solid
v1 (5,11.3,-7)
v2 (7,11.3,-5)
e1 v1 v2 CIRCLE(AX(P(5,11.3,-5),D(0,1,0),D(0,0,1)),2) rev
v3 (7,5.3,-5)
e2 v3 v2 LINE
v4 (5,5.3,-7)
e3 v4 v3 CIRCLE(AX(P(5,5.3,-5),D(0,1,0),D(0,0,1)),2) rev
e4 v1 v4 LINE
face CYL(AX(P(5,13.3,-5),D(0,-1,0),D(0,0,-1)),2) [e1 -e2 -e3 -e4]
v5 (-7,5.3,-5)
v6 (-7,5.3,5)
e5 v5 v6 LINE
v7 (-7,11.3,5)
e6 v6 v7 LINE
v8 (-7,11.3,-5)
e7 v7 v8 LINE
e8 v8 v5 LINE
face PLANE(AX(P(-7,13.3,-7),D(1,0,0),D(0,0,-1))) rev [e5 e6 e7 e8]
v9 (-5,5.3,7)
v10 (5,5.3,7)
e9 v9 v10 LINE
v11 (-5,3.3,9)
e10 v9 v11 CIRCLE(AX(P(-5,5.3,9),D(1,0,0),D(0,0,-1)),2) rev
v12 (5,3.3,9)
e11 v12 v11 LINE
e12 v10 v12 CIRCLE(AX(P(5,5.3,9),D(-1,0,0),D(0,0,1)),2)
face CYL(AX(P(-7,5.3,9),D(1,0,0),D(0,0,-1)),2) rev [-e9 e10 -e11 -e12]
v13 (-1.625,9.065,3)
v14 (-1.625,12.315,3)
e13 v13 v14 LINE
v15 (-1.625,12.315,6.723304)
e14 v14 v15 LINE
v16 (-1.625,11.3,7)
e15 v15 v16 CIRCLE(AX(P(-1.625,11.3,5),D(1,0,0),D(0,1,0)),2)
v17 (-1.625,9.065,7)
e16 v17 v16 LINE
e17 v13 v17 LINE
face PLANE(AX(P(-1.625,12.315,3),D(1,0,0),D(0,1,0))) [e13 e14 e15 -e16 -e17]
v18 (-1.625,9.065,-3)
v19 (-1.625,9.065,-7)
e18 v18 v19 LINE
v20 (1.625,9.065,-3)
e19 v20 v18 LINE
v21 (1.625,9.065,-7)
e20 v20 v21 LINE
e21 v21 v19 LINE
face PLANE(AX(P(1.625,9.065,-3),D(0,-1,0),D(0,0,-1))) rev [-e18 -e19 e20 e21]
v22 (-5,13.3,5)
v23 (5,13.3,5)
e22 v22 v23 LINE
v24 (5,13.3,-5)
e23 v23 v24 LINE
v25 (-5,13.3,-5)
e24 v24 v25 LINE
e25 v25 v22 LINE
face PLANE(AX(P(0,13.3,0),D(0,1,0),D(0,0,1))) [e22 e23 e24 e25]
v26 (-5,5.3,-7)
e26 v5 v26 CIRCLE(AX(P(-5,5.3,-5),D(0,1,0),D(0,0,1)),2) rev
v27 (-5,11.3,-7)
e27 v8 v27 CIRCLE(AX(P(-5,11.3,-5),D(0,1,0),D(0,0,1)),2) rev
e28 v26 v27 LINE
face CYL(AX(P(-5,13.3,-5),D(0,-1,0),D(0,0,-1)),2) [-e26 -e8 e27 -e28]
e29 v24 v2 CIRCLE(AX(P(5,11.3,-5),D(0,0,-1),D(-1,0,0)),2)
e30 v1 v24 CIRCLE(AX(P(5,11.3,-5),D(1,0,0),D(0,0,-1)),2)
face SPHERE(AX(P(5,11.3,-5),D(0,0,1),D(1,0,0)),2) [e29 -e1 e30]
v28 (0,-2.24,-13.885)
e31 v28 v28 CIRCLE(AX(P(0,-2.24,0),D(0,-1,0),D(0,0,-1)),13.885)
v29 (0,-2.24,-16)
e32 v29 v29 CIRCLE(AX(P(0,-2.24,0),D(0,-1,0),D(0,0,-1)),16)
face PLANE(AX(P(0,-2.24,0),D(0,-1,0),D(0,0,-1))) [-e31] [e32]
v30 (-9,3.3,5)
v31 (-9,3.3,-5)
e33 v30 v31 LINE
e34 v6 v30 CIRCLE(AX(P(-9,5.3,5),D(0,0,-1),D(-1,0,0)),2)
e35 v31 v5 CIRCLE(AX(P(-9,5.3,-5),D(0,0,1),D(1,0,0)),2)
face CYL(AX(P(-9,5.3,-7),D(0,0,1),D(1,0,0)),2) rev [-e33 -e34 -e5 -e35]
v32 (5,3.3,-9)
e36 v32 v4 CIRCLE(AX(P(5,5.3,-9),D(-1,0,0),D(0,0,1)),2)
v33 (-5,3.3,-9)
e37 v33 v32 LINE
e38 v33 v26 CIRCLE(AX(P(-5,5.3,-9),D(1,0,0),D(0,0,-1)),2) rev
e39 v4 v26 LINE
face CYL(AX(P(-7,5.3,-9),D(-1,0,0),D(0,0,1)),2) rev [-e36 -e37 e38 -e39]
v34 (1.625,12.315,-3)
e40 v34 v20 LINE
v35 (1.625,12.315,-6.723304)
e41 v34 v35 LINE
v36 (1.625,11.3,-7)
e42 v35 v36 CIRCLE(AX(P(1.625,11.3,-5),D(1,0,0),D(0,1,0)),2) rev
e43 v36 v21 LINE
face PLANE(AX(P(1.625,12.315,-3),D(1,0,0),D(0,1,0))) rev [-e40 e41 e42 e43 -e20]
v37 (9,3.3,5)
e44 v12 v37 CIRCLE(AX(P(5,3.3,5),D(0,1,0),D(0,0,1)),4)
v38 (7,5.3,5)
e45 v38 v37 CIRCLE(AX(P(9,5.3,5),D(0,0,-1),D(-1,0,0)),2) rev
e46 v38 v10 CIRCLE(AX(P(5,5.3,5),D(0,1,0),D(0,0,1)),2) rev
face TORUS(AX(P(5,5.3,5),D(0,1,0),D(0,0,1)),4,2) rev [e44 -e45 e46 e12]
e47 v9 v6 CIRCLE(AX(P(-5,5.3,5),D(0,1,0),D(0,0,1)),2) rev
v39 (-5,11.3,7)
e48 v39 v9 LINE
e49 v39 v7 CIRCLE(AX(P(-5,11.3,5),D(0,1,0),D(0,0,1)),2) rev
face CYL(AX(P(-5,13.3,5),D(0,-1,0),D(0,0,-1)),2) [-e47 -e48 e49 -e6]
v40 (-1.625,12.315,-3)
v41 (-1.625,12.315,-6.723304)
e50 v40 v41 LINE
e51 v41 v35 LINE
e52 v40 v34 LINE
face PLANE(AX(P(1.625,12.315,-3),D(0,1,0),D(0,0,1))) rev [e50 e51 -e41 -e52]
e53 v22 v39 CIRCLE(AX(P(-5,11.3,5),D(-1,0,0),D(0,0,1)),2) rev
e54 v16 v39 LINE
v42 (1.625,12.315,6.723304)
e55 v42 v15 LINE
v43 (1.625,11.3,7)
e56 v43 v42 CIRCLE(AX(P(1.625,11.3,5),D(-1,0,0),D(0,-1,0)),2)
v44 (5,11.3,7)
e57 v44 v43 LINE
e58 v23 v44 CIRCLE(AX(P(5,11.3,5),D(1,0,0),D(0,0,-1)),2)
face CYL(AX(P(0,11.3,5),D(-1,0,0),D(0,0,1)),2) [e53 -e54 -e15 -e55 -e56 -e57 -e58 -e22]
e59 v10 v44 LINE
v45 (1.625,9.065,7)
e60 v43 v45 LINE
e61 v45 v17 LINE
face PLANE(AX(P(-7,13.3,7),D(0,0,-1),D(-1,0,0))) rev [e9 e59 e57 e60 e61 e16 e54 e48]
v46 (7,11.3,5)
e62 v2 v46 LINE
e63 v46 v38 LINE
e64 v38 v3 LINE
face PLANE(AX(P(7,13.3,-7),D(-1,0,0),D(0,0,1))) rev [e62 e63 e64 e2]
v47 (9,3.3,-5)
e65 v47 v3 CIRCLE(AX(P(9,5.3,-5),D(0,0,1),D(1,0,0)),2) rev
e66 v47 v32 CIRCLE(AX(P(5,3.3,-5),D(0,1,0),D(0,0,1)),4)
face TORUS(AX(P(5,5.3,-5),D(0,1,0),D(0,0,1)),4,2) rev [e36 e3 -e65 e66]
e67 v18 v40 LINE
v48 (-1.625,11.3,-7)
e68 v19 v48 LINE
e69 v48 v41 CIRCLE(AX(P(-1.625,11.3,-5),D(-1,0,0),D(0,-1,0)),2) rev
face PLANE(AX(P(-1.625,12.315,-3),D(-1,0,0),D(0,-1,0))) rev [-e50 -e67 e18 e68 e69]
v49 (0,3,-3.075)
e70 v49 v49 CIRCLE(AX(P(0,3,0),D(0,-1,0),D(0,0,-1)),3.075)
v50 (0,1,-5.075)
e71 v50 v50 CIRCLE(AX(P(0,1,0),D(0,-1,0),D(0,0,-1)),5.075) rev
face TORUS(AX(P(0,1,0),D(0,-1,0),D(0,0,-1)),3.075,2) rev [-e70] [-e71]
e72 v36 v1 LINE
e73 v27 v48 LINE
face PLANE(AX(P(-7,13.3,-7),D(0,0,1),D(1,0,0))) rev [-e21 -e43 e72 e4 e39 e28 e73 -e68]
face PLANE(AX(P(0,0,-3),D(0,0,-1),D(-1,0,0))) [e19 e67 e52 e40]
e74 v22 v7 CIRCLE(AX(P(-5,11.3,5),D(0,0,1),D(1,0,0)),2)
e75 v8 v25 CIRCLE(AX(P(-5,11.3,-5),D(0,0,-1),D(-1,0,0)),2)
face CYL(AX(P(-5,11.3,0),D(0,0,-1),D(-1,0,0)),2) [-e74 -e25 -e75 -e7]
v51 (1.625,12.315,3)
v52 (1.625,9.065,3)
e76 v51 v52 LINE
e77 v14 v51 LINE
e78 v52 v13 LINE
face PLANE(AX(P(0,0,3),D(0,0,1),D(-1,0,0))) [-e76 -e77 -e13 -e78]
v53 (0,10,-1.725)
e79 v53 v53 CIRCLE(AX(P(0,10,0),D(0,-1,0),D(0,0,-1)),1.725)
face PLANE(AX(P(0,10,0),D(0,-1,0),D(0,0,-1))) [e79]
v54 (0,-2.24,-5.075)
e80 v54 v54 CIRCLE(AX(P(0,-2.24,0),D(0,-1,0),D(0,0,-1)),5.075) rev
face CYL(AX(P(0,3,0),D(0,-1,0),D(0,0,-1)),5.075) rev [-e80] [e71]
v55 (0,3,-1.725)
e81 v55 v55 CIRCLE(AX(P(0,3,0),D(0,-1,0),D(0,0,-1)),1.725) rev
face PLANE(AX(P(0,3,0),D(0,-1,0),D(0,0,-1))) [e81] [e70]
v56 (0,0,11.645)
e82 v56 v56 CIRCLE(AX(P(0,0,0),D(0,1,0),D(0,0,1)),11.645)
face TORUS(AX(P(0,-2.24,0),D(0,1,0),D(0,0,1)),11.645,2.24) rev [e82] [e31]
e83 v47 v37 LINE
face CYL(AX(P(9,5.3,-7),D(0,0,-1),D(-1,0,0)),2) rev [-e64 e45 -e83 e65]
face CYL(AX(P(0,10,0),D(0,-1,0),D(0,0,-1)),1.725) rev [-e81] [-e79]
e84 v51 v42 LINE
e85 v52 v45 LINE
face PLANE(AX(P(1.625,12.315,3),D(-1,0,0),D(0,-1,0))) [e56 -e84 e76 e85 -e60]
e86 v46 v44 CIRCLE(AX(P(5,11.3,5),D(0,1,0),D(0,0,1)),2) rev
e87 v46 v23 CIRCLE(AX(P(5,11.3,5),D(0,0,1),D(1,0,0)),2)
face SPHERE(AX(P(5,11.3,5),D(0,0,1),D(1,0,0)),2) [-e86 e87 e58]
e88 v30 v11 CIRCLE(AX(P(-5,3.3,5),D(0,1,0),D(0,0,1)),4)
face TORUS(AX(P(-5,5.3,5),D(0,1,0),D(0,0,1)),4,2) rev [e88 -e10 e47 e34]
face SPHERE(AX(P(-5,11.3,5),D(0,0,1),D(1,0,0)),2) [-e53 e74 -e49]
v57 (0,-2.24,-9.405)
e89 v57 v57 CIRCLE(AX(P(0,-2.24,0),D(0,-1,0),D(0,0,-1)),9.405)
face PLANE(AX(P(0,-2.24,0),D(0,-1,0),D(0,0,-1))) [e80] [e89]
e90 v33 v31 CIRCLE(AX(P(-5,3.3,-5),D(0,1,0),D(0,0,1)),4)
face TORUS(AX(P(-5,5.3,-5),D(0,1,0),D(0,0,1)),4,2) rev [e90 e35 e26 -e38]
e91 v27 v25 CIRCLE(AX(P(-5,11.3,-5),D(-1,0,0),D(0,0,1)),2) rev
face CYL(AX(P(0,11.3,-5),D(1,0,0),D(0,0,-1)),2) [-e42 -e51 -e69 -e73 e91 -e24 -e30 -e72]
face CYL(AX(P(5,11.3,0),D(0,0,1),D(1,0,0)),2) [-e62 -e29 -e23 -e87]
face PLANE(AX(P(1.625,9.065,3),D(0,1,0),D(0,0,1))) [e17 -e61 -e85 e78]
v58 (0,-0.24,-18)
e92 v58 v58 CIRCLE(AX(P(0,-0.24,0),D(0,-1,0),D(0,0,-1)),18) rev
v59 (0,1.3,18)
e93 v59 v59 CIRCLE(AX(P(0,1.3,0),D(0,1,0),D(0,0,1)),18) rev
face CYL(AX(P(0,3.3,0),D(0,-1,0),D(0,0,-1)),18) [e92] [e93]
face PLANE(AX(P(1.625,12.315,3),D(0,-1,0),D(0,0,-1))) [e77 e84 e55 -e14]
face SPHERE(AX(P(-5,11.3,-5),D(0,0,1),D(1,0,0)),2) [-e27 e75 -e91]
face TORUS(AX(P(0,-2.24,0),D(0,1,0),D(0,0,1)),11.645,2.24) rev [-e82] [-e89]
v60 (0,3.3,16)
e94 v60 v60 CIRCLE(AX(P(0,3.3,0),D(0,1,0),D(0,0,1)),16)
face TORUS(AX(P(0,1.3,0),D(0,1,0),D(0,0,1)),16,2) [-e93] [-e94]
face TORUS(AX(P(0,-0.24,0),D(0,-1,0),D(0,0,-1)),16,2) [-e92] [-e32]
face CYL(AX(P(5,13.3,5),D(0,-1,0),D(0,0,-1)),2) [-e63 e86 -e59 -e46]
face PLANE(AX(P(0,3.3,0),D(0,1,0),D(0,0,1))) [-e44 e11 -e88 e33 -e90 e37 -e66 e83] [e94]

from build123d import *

# Parameters (mm, degrees)
SKETCH2_R           = 18
BOSS_EXTRUDE1_DEPTH = 3.3
SKETCH3_W           = 14
SKETCH3_H           = 14
BOSS_EXTRUDE2_DEPTH = 10
SKETCH12_R          = 1.725
CUT_EXTRUDE2_DEPTH  = 10
SKETCH13_R          = 5.075
CUT_EXTRUDE4_DEPTH  = 3
BOSS_EXTRUDE3_START = 2.24
SKETCH17_R          = 18
SKETCH17_R_2        = 13.885
SKETCH17_R_3        = 9.405
SKETCH17_R_4        = 5.075
BOSS_EXTRUDE3_DEPTH = 2.24
FILLET8_R           = 2.24
FILLET7_R           = 2
SKETCH21_W          = 3.25
SKETCH21_H          = 3.25
CUT_EXTRUDE6_DEPTH  = 4
FILLET9_R           = 2


# Some blends are built 0.0001 mm under size
with BuildPart() as part:
    # Sketch2 → Boss-Extrude1 (new body)
    with BuildSketch(Plane(origin=(0, 0, 0), x_dir=(1, 0, 0), z_dir=(0, 1, 0))):
        with Locations(Location((0, 0, 0), (0, 0, 270))):
            Circle(SKETCH2_R)
    extrude(amount=BOSS_EXTRUDE1_DEPTH)

    # Sketch3 → Boss-Extrude2 (add)
    with BuildSketch(Plane(origin=(0, 3.3, 0), x_dir=(1, 0, 0), z_dir=(0, 1, 0))):
        Rectangle(SKETCH3_W, SKETCH3_H)
    extrude(amount=BOSS_EXTRUDE2_DEPTH)

    # Sketch12 → Cut-Extrude2 (cut)
    with BuildSketch(Plane.XZ):
        with Locations(Location((0, 0, 0), (0, 0, 270))):
            Circle(SKETCH12_R)
    extrude(amount=-CUT_EXTRUDE2_DEPTH, mode=Mode.SUBTRACT)

    # Sketch13 → Cut-Extrude4 (cut)
    with BuildSketch(Plane.XZ):
        with Locations(Location((0, 0, 0), (0, 0, 270))):
            Circle(SKETCH13_R)
    extrude(amount=-CUT_EXTRUDE4_DEPTH, mode=Mode.SUBTRACT)

    # Sketch17 → Boss-Extrude3 (add)
    # profile 1 of 2: a face of its own
    with BuildSketch(Plane.XZ.offset(BOSS_EXTRUDE3_START)):
        with Locations(Location((0, 0, 0), (0, 0, 270))):
            Circle(SKETCH17_R)
        with Locations(Location((0, 0, 0), (0, 0, 270))):
            Circle(SKETCH17_R_2, mode=Mode.SUBTRACT)
    # profile 2 of 2: a face of its own
    with BuildSketch(Plane.XZ.offset(BOSS_EXTRUDE3_START)):
        with Locations(Location((0, 0, 0), (0, 0, 90))):
            Circle(SKETCH17_R_3)
        with Locations(Location((0, 0, 0), (0, 0, 270))):
            Circle(SKETCH17_R_4, mode=Mode.SUBTRACT)
    extrude(amount=-BOSS_EXTRUDE3_DEPTH)

    # Fillet8
    fillet8_edges = [part.edges().sort_by_distance(p)[0] for p in [
        (0, 0, 13.885),
        (0, 0, -9.405),
    ]]
    fillet(fillet8_edges, radius=FILLET8_R - 0.0001)  # a hair under: the kernel refuses the full size

    # Fillet7
    fillet7_edges = [part.edges().sort_by_distance(p)[0] for p in [
        (0, 3, 5.075),
    ]]
    fillet(fillet7_edges, radius=FILLET7_R)

    # Sketch21 → Cut-Extrude6 (cut)
    with BuildSketch(Plane(origin=(0, 0, -7), x_dir=(-1, 0, 0), z_dir=(0, 0, -1))):
        with Locations((0, 10.69)):
            Rectangle(SKETCH21_W, SKETCH21_H)
    cut_extrude6 = extrude(amount=-CUT_EXTRUDE6_DEPTH, mode=Mode.SUBTRACT)

    # Mirror2: Cut-Extrude6 across plane
    add(cut_extrude6.mirror(Plane.XY), mode=Mode.SUBTRACT)

    # Fillet9
    # the kernel refuses this fillet: 2 mm, written as the material it takes off along each edge
    with BuildSketch(Plane(origin=(5, 11.3, 5), x_dir=(1, 0, 0), z_dir=(0, 0, 1))) as fillet9_piece_1_section:
        Polygon((0, 0), (FILLET9_R, 0), (FILLET9_R, FILLET9_R), (0, FILLET9_R), align=None)
    fillet9_piece_1 = extrude(amount=FILLET9_R, mode=Mode.PRIVATE)
    fillet9_piece_1 = fillet9_piece_1 - Plane(origin=(5, 11.3, 5), x_dir=(-0.7071067811865475, -0.7071067811865475, 0), z_dir=(0, 0, 1)) * Sphere(FILLET9_R, mode=Mode.PRIVATE)
    add(fillet9_piece_1, mode=Mode.SUBTRACT)
    with BuildSketch(Plane(origin=(-5, 11.3, 5), x_dir=(0, 1, 0), z_dir=(0, 0, 1))) as fillet9_piece_2_section:
        Polygon((0, 0), (FILLET9_R, 0), (FILLET9_R, FILLET9_R), (0, FILLET9_R), align=None)
    fillet9_piece_2 = extrude(amount=FILLET9_R, mode=Mode.PRIVATE)
    fillet9_piece_2 = fillet9_piece_2 - Plane(origin=(-5, 11.3, 5), x_dir=(0.7071067811865475, -0.7071067811865475, 0), z_dir=(0, 0, 1)) * Sphere(FILLET9_R, mode=Mode.PRIVATE)
    add(fillet9_piece_2, mode=Mode.SUBTRACT)
    with BuildSketch(Plane(origin=(-5, 11.3, -5), x_dir=(0, 1, 0), z_dir=(0, 0, -1))) as fillet9_piece_3_section:
        Polygon((0, 0), (FILLET9_R, 0), (FILLET9_R, -FILLET9_R), (0, -FILLET9_R), align=None)
    fillet9_piece_3 = extrude(amount=FILLET9_R, mode=Mode.PRIVATE)
    fillet9_piece_3 = fillet9_piece_3 - Plane(origin=(-5, 11.3, -5), x_dir=(0.7071067811865475, -0.7071067811865475, 0), z_dir=(0, 0, -1)) * Sphere(FILLET9_R, mode=Mode.PRIVATE)
    add(fillet9_piece_3, mode=Mode.SUBTRACT)
    with BuildSketch(Plane(origin=(5, 11.3, -5), x_dir=(0, 0, -1), z_dir=(1, 0, 0))) as fillet9_piece_4_section:
        Polygon((0, 0), (FILLET9_R, 0), (FILLET9_R, FILLET9_R), (0, FILLET9_R), align=None)
    fillet9_piece_4 = extrude(amount=FILLET9_R, mode=Mode.PRIVATE)
    fillet9_piece_4 = fillet9_piece_4 - Plane(origin=(5, 11.3, -5), x_dir=(0, -0.7071067811865475, 0.7071067811865475), z_dir=(1, 0, 0)) * Sphere(FILLET9_R, mode=Mode.PRIVATE)
    add(fillet9_piece_4, mode=Mode.SUBTRACT)
    with BuildSketch(Plane(origin=(5, 13.3, 7), x_dir=(0, -1, 0), z_dir=(-1, 0, 0)), Plane(origin=(-7, 13.3, 5), x_dir=(0, -1, 0), z_dir=(0, 0, -1)), Plane(origin=(-5, 13.3, -7), x_dir=(0, -1, 0), z_dir=(1, 0, 0)), Plane(origin=(7, 13.3, -5), x_dir=(0, -1, 0), z_dir=(0, 0, 1))) as fillet9_piece_5:
        with BuildLine():
            CenterArc((FILLET9_R, -FILLET9_R), FILLET9_R, 90, 90)
            Line((0, -FILLET9_R), (0, 0))
            Line((0, 0), (FILLET9_R, 0))
        make_face()
    extrude(amount=10, mode=Mode.SUBTRACT)
    with BuildSketch(Plane(origin=(0, -2.24, 0), x_dir=(0, 0, -1), z_dir=(-1, 0, 0))) as fillet9_piece_6:
        with BuildLine():
            CenterArc((18 - FILLET9_R, -FILLET9_R), FILLET9_R, 0, 90)
            Line((18, -FILLET9_R), (18, 0))
            Line((18, 0), (18 - FILLET9_R, 0))
        make_face()
    revolve(axis=Axis((0, -2.24, 0), (0, -1, 0)), mode=Mode.SUBTRACT)
    with BuildSketch(Plane(origin=(0, 3.3, 0), x_dir=(0, 0, 1), z_dir=(-1, 0, 0))) as fillet9_piece_7:
        with BuildLine():
            CenterArc((18 - FILLET9_R, -FILLET9_R), FILLET9_R, 0, 90)
            Line((18 - FILLET9_R, 0), (18, 0))
            Line((18, 0), (18, -FILLET9_R))
        make_face()
    revolve(axis=Axis((0, 3.3, 0), (0, 1, 0)), mode=Mode.SUBTRACT)
    with BuildSketch(Plane(origin=(7, 3.3, 7), x_dir=(-1, 0, 0), z_dir=(0, 1, 0)), Plane(origin=(-7, 3.3, 7), x_dir=(0, 0, -1), z_dir=(0, 1, 0)), Plane(origin=(7, 3.3, -7), x_dir=(0, 0, 1), z_dir=(0, 1, 0))) as fillet9_piece_8:
        with BuildLine():
            CenterArc((FILLET9_R, -FILLET9_R), FILLET9_R, 90, 90)
            Line((0, -FILLET9_R), (0, 0))
            Line((0, 0), (FILLET9_R, 0))
        make_face()
    extrude(amount=8, mode=Mode.SUBTRACT)
    with BuildSketch(Plane(origin=(-7, 3.3, -7), x_dir=(0, 0, 1), z_dir=(0, 1, 0))) as fillet9_piece_9:
        with BuildLine():
            CenterArc((FILLET9_R, FILLET9_R), FILLET9_R, 180, 90)
            Line((0, FILLET9_R), (0, 0))
            Line((0, 0), (FILLET9_R, 0))
        make_face()
    extrude(amount=8, mode=Mode.SUBTRACT)
    # the kernel refuses this fillet: 2 mm, written as the material it adds along each edge
    with BuildSketch(Plane(origin=(7, 3.3, -5), x_dir=(1, 0, 0), z_dir=(0, 0, 1)), Plane(origin=(-5, 3.3, -7), x_dir=(0, 0, -1), z_dir=(1, 0, 0)), Plane(origin=(5, 3.3, 7), x_dir=(0, 0, 1), z_dir=(-1, 0, 0)), Plane(origin=(-7, 3.3, 5), x_dir=(-1, 0, 0), z_dir=(0, 0, -1))) as fillet9_2_piece_1:
        with BuildLine():
            CenterArc((FILLET9_R, FILLET9_R), FILLET9_R, 180, 90)
            Line((0, FILLET9_R), (0, 0))
            Line((0, 0), (FILLET9_R, 0))
        make_face()
    extrude(amount=10)
    with BuildSketch(Plane(origin=(-5, 3.3, 5), x_dir=(-1, 0, 0), z_dir=(0, 0, -1))) as fillet9_2_piece_2:
        with BuildLine():
            CenterArc((2 + FILLET9_R, FILLET9_R), FILLET9_R, 180, 90)
            Line((2, FILLET9_R), (2, 0))
            Line((2, 0), (2 + FILLET9_R, 0))
        make_face()
    revolve(axis=Axis((-5, 3.3, 5), (0, 1, 0)), revolution_arc=90)
    with BuildSketch(Plane(origin=(-5, 3.3, -5), x_dir=(-1, 0, 0), z_dir=(0, 0, 1))) as fillet9_2_piece_3:
        with BuildLine():
            CenterArc((2 + FILLET9_R, -FILLET9_R), FILLET9_R, 90, 90)
            Line((2, -FILLET9_R), (2, 0))
            Line((2, 0), (2 + FILLET9_R, 0))
        make_face()
    revolve(axis=Axis((-5, 3.3, -5), (0, -1, 0)), revolution_arc=90)
    with BuildSketch(Plane(origin=(5, 3.3, 5), x_dir=(0, 0, 1), z_dir=(-1, 0, 0))) as fillet9_2_piece_4:
        with BuildLine():
            CenterArc((2 + FILLET9_R, FILLET9_R), FILLET9_R, 180, 90)
            Line((2, FILLET9_R), (2, 0))
            Line((2, 0), (2 + FILLET9_R, 0))
        make_face()
    revolve(axis=Axis((5, 3.3, 5), (0, 1, 0)), revolution_arc=90)
    with BuildSketch(Plane(origin=(5, 3.3, -5), x_dir=(1, 0, 0), z_dir=(0, 0, 1))) as fillet9_2_piece_5:
        with BuildLine():
            CenterArc((2 + FILLET9_R, FILLET9_R), FILLET9_R, 180, 90)
            Line((2, FILLET9_R), (2, 0))
            Line((2, 0), (2 + FILLET9_R, 0))
        make_face()
    revolve(axis=Axis((5, 3.3, -5), (0, 1, 0)), revolution_arc=90)


solid = part.part
